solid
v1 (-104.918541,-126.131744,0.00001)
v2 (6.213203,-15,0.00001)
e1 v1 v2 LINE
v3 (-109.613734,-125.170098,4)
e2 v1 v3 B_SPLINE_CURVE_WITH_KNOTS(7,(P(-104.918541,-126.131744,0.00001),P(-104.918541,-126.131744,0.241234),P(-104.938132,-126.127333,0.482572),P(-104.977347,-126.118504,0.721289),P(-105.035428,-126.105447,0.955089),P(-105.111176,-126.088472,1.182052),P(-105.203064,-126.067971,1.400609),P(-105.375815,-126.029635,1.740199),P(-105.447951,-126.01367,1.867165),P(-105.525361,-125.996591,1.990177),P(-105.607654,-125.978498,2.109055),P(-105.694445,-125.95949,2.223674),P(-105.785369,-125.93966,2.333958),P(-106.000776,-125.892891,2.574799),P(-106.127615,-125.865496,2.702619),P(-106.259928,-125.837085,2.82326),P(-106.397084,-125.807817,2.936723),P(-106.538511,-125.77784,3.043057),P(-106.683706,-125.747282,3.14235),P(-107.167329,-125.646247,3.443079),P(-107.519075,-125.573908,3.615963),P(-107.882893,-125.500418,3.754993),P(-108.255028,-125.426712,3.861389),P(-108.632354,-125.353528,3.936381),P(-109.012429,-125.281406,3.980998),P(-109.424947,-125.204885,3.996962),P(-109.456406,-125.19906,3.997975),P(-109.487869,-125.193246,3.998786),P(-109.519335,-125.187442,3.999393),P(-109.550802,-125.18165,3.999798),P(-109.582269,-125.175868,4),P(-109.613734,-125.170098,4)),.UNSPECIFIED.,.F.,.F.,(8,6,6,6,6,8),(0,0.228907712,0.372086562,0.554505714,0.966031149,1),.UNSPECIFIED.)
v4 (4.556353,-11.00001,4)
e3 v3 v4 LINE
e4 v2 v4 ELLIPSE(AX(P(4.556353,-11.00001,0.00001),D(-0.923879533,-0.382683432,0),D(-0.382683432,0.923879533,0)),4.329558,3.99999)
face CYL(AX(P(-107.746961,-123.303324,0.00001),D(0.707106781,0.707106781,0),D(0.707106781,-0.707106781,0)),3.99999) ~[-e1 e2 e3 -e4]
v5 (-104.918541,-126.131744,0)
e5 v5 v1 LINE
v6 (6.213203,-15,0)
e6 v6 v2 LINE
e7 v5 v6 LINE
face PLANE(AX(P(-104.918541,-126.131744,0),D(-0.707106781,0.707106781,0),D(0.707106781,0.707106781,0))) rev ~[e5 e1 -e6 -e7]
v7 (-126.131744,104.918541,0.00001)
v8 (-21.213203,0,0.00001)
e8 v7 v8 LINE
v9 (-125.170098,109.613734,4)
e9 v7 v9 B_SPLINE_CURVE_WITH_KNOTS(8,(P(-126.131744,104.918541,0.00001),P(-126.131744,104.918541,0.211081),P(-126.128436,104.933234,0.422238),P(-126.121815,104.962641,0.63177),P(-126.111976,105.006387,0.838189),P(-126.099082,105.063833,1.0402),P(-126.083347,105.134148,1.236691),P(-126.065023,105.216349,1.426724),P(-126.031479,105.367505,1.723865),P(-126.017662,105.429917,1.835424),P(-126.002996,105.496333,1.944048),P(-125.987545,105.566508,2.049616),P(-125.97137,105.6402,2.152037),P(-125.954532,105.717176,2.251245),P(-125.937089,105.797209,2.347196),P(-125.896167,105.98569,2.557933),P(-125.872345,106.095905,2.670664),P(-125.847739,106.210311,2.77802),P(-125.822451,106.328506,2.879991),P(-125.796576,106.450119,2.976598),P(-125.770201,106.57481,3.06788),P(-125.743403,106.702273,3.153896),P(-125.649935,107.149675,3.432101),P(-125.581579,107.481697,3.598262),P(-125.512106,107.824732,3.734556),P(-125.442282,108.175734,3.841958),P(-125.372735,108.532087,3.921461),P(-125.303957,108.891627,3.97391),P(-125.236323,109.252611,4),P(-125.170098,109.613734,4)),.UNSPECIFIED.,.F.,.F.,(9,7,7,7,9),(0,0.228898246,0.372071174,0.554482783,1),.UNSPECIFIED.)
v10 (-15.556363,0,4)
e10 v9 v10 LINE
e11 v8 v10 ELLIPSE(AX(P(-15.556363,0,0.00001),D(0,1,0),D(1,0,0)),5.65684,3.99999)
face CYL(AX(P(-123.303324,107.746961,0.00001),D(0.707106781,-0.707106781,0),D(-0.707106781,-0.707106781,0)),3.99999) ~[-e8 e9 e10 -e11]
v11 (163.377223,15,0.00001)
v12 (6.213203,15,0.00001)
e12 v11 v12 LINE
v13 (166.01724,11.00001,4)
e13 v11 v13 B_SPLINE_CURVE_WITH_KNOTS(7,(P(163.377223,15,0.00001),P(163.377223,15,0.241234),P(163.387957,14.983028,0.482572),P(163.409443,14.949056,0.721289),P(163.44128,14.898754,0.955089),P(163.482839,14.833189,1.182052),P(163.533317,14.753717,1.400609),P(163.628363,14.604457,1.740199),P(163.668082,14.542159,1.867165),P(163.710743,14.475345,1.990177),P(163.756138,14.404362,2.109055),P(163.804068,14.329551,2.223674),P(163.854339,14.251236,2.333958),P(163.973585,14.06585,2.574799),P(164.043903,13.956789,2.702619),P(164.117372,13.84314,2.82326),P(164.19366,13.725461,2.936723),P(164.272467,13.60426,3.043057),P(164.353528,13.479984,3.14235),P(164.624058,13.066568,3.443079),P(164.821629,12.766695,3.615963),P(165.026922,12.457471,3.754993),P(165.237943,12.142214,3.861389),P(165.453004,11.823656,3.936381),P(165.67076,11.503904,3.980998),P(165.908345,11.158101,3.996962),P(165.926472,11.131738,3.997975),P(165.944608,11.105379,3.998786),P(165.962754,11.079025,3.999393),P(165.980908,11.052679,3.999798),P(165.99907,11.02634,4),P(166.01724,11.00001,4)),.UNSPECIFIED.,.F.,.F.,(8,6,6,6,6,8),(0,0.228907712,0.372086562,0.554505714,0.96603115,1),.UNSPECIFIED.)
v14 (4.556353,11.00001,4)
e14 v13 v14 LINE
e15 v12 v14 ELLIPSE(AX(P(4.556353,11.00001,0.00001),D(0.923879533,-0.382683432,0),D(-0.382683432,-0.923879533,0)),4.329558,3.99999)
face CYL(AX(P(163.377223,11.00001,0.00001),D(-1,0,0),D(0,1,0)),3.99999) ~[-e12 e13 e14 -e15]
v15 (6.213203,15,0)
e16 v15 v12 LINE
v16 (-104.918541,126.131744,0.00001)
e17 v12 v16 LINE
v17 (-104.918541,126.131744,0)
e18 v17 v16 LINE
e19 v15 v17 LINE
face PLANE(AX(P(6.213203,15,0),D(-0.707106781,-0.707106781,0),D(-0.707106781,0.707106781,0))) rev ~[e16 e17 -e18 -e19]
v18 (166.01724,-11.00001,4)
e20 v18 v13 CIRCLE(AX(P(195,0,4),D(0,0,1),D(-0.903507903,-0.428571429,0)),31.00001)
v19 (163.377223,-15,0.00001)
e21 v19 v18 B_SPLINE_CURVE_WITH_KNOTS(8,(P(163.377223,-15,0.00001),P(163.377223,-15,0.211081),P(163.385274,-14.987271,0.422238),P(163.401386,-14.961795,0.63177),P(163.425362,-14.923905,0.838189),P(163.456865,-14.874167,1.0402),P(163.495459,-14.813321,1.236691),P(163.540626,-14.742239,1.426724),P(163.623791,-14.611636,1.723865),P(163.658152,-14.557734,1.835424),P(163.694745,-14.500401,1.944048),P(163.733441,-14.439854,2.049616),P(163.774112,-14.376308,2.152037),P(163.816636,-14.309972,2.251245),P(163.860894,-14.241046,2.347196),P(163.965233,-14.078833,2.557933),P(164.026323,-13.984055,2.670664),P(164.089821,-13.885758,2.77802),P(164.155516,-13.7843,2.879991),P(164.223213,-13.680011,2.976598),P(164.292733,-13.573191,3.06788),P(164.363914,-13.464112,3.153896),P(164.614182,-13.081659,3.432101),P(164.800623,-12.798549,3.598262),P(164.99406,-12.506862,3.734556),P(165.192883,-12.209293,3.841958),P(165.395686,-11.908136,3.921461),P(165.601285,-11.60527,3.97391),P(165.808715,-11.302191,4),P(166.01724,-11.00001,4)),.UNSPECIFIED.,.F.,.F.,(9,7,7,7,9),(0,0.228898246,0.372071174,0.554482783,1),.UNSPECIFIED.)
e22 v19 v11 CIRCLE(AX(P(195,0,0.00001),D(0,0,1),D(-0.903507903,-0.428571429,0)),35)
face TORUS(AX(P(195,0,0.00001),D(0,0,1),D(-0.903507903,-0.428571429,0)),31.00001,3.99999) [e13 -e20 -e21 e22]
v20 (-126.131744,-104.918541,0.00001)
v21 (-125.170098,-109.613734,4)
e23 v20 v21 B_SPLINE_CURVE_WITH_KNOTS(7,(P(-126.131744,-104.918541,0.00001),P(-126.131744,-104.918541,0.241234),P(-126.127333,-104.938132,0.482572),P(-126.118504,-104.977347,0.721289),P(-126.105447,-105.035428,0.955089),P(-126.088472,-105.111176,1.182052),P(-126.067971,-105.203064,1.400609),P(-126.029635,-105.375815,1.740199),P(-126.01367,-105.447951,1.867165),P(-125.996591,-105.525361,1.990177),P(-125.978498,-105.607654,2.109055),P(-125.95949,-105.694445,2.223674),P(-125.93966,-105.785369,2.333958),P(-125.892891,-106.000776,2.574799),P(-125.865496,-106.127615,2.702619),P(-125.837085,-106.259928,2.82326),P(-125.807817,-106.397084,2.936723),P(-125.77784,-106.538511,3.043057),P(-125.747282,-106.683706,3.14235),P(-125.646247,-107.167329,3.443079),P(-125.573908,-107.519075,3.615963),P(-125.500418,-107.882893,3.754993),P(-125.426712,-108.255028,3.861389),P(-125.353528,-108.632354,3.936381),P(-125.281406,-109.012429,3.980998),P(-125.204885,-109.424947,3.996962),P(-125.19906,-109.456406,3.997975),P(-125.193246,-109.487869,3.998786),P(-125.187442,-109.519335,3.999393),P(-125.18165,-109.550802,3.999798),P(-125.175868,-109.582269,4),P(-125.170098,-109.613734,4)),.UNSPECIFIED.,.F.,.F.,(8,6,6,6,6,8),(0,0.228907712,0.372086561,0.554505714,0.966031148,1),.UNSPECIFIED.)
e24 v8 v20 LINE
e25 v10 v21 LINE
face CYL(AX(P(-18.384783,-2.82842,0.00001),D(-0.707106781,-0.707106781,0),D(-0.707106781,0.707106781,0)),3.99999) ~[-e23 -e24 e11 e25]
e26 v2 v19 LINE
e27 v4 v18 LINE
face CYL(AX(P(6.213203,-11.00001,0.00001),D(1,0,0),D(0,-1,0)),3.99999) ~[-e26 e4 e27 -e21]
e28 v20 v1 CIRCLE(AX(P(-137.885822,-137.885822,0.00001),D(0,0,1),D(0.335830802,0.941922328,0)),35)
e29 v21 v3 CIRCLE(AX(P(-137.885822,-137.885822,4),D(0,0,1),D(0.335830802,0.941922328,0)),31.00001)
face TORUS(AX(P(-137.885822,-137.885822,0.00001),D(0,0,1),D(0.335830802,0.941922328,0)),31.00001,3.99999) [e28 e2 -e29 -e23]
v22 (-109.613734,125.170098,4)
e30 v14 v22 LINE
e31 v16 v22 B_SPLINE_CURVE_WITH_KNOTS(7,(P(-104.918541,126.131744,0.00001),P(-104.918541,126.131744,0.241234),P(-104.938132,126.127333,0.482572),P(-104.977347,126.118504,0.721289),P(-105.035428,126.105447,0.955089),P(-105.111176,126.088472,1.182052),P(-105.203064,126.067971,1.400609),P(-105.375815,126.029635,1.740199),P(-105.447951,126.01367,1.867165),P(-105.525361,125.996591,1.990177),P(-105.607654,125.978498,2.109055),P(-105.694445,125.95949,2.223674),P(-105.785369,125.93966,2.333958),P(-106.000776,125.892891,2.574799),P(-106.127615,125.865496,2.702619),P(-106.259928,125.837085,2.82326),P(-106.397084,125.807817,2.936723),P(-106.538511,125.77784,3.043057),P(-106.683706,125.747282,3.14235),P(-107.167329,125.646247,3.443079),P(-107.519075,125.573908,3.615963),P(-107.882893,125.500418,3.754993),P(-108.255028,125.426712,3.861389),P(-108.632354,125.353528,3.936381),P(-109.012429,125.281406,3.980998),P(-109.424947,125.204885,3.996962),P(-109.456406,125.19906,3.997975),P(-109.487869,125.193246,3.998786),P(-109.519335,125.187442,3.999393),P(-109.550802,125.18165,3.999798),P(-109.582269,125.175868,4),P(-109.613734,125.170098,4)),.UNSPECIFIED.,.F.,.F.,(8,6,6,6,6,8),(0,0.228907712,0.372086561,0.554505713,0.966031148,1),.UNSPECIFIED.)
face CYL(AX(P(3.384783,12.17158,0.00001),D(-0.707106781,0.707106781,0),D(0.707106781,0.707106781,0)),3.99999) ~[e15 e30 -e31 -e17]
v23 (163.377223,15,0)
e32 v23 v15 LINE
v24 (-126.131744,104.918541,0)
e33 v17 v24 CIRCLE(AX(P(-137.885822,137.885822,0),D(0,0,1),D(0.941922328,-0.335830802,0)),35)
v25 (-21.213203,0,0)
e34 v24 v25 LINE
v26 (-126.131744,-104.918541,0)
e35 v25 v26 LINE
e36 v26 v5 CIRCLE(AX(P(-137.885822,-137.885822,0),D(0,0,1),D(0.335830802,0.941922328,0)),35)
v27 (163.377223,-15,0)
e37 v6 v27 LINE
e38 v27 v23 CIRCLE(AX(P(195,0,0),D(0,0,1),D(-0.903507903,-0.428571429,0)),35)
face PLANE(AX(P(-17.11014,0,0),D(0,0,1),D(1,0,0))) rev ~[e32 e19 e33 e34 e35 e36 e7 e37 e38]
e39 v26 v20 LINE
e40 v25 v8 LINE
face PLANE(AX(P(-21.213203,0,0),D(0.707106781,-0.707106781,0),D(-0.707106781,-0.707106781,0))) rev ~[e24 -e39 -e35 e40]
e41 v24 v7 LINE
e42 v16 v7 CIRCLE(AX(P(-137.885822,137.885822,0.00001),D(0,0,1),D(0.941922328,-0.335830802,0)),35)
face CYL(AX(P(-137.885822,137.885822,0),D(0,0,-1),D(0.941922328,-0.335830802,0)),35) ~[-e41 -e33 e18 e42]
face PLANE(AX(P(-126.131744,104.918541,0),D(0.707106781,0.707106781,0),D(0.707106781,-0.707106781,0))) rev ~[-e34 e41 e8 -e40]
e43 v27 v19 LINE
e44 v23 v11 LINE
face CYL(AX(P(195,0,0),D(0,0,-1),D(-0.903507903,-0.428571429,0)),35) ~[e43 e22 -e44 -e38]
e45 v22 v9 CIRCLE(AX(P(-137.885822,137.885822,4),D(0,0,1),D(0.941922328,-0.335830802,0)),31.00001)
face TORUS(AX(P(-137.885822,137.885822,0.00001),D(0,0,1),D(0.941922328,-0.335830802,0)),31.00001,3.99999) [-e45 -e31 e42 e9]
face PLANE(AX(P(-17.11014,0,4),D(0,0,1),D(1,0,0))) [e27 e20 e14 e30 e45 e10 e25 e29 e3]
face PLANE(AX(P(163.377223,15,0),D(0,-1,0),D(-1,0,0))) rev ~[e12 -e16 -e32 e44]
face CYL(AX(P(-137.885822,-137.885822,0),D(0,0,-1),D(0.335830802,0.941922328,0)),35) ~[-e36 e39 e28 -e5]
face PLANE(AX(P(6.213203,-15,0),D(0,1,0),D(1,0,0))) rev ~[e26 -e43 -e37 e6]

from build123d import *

# Parameters (mm, degrees)
F1_DEPTH = 4
F2_R     = 3.99999


# Not quite as in the source:
# - a fillet or chamfer is up to 0.001 mm smaller than in the source, because OpenCascade refuses the exact size


with BuildPart() as f1:
    # F0 (on Top) → F1 (new body)
    with BuildSketch(Plane.XY):
        with BuildLine():
            Line((6.2132034356, -15), (163.3772233983, -15))
            ThreePointArc((163.3772233983, -15), (230, 0), (163.3772233983, 15))
            Line((163.3772233983, 15), (6.2132034356, 15))
            Line((6.2132034356, 15), (-104.9185408386, 126.1317442742))
            ThreePointArc((-104.9185408386, 126.1317442742), (-162.6345596729, 162.6345596729), (-126.1317442742, 104.9185408386))
            Line((-126.1317442742, 104.9185408386), (-21.2132034356, 0))
            Line((-21.2132034356, 0), (-126.1317442742, -104.9185408386))
            ThreePointArc((-126.1317442742, -104.9185408386), (-162.6345596729, -162.6345596729), (-104.9185408386, -126.1317442742))
            Line((-104.9185408386, -126.1317442742), (6.2132034356, -15))
        make_face()
    extrude(amount=F1_DEPTH)

    # F2 (radius 4 in the source; OpenCascade refuses exactly that, so slightly less here)
    f2_edges = [f1.edges().sort_by_distance(p)[0] for p in [
        (-49.352669, -70.565872, 4),
        (84.795213, -15, 4),
        (230, 0, 4),
        (84.795213, 15, 4),
        (-49.352669, 70.565872, 4),
        (-162.63456, 162.63456, 4),
        (-73.672474, 52.45927, 4),
        (-73.672474, -52.45927, 4),
        (-162.63456, -162.63456, 4),
    ]]
    fillet(f2_edges, radius=F2_R)


solid = f1.part
